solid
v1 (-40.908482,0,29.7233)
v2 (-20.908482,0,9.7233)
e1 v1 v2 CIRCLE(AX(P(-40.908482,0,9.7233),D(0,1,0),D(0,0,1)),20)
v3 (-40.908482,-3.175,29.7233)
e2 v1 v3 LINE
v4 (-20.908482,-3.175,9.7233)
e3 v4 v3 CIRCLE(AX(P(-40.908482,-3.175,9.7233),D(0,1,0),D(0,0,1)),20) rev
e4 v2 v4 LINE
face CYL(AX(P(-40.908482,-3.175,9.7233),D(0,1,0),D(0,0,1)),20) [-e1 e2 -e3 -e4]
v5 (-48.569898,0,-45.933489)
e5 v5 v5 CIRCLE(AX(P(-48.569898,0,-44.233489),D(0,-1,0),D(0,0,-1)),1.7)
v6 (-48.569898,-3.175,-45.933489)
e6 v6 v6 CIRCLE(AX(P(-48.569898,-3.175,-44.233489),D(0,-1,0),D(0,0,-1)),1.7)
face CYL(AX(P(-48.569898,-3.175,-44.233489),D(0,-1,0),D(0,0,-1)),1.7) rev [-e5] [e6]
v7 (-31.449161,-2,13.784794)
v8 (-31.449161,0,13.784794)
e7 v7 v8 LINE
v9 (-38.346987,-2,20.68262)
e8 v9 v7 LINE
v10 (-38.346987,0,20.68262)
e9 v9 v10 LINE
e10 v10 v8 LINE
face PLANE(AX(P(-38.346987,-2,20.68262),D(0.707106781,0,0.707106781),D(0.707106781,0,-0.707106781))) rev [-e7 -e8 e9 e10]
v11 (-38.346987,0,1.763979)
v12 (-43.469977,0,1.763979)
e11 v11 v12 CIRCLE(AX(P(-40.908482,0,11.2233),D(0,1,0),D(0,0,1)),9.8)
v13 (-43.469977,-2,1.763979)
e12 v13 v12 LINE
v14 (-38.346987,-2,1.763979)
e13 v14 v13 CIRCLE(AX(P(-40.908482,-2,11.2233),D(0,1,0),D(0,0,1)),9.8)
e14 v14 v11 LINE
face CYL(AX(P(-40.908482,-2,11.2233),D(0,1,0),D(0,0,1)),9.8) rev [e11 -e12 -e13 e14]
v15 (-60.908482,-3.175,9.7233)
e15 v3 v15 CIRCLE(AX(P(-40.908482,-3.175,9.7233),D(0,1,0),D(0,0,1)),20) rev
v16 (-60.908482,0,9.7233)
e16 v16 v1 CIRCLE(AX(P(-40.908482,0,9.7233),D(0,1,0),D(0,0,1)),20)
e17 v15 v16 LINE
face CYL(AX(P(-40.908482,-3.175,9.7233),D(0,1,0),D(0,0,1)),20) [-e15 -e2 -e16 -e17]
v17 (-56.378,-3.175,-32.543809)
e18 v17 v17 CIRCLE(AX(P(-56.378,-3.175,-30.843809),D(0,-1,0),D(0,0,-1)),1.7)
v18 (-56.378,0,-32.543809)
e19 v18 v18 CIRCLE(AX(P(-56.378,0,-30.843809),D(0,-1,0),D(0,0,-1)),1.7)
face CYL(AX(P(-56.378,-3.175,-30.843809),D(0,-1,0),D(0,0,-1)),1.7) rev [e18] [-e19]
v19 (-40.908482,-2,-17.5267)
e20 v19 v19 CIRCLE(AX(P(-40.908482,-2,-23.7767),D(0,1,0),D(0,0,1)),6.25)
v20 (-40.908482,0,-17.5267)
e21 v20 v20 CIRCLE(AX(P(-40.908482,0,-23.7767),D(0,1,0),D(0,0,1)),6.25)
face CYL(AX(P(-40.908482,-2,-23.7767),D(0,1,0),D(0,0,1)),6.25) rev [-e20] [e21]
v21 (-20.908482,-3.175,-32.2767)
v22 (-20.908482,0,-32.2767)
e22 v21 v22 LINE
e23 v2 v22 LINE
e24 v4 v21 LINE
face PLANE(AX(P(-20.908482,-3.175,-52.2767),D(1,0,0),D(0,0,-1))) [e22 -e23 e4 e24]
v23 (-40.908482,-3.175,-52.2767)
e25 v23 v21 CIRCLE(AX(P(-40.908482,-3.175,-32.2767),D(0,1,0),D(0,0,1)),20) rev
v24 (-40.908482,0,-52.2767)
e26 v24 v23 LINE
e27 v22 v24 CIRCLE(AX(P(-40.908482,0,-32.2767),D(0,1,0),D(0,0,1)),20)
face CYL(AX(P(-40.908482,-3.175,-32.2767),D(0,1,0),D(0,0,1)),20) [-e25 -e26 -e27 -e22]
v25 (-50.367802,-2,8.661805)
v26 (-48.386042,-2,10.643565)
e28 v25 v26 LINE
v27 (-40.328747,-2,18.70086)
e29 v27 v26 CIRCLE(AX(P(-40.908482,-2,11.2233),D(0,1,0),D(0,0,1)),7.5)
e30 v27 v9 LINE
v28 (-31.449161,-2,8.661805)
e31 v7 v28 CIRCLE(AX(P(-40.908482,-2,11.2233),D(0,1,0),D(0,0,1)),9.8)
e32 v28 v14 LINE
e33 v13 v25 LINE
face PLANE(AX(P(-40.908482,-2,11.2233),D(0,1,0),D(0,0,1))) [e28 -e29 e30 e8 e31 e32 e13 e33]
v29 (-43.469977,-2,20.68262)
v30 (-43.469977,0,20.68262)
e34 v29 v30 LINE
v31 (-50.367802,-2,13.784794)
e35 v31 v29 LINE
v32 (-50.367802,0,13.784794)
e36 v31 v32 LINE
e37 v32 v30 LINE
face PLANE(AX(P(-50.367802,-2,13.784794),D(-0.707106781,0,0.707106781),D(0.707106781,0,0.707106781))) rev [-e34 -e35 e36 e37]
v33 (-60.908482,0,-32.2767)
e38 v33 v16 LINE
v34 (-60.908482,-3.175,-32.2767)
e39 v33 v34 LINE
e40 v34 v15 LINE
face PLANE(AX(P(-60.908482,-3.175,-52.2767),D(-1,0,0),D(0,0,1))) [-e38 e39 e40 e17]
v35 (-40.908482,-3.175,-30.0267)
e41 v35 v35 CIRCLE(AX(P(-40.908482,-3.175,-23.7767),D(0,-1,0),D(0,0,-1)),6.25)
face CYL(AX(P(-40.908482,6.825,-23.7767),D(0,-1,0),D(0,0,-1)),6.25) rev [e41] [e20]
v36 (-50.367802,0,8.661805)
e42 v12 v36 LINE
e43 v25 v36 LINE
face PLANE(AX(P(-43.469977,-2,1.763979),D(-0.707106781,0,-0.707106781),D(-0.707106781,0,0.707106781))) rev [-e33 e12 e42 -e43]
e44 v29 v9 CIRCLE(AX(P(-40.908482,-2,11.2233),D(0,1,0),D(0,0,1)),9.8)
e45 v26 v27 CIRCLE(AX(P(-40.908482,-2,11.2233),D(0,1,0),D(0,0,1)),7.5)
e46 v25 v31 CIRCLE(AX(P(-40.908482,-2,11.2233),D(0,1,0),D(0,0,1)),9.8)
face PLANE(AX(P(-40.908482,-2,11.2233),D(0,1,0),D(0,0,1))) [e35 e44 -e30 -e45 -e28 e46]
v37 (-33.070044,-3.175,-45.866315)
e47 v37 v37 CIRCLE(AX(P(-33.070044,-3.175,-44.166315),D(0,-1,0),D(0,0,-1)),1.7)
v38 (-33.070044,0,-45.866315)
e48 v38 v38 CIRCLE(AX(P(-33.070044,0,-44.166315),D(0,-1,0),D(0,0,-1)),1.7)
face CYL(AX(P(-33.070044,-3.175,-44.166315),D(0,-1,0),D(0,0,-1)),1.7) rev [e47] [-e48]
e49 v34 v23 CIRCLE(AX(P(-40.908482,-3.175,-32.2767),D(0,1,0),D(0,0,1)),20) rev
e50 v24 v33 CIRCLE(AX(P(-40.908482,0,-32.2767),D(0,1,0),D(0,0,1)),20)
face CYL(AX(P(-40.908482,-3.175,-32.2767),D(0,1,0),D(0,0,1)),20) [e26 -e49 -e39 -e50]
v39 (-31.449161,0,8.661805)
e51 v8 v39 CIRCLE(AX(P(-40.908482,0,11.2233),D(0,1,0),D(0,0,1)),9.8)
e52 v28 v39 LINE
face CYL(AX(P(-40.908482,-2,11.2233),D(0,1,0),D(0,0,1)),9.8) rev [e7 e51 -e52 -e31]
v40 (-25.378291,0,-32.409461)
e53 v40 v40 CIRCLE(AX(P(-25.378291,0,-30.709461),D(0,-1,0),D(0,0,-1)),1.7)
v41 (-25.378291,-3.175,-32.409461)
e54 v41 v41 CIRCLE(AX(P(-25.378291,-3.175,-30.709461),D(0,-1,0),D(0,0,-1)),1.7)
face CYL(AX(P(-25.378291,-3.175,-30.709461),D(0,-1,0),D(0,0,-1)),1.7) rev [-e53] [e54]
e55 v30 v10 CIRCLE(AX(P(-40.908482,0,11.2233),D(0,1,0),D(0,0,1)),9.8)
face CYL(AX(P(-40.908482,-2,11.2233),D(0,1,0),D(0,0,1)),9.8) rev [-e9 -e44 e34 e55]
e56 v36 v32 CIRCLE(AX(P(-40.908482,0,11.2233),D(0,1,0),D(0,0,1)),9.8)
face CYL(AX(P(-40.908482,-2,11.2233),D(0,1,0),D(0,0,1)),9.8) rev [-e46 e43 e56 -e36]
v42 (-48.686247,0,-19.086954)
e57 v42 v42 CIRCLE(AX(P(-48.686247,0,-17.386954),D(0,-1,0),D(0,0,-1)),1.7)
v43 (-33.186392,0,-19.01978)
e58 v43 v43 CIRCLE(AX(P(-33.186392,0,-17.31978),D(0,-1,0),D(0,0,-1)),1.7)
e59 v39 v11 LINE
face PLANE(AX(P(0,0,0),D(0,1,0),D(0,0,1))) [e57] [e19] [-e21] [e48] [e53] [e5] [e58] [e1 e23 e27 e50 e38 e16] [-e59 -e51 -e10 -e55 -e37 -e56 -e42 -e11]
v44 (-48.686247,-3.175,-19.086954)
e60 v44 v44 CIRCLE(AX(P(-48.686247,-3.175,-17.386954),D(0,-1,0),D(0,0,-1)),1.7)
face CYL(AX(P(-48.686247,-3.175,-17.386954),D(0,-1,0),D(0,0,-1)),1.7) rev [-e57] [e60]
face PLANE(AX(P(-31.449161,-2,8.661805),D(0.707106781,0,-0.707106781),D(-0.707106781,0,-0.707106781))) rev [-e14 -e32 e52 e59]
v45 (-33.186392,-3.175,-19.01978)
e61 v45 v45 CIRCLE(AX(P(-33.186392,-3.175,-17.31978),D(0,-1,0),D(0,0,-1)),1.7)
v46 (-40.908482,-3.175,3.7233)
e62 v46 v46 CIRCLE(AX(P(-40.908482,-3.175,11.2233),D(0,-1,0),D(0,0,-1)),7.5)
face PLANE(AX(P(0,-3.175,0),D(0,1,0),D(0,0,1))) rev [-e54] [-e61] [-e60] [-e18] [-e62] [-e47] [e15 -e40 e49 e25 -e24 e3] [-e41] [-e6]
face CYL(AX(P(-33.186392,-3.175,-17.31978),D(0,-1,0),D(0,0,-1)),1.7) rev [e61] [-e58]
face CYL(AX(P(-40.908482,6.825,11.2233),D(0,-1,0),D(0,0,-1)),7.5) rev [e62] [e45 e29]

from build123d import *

# Parameters (mm, degrees)
CROQUIS1_W                   = 40
CROQUIS1_H                   = 82
BRIDA_BASE1_DEPTH            = 3.175
CROQUIS6_R                   = 6.25
CORTAR_EXTRUIR17_DEPTH       = 2
CORTAR_EXTRUIR5_START        = -10
CROQUIS5_R                   = 7.5
CROQUIS5_R_2                 = 6.25
CORTAR_EXTRUIR5_DEPTH        = 10
REDONDEO1_R                  = 20
TALADRO_DE_MARGEN_PARA_M31_D = 3.4


# Sheet-metal steps are written as plain solids
with BuildPart() as part:
    # Croquis1 → Brida base1 (new body)
    with BuildSketch(Plane(origin=(0, 0, 0), x_dir=(1, 0, 0), z_dir=(0, 1, 0))):
        with Locations((-40.908481915, 11.276700353)):
            Rectangle(CROQUIS1_W, CROQUIS1_H)
    extrude(amount=-BRIDA_BASE1_DEPTH)

    # Croquis6 → Cortar-Extruir17 (cut)
    with BuildSketch(Plane(origin=(0, 0, 0), x_dir=(1, 0, 0), z_dir=(0, 1, 0))):
        with Locations(Location((-40.908481915, 23.776700353, 0), (0, 0, 270))):
            Circle(CROQUIS6_R)
        with BuildLine():
            Line((-43.469976683, -1.763979135), (-50.367802427, -8.661804879))
            ThreePointArc((-50.367802427, -8.661804879), (-50.708481915, -11.223299647), (-50.367802427, -13.784794415))
            Line((-50.367802427, -13.784794415), (-43.469976683, -20.682620159))
            ThreePointArc((-43.469976683, -20.682620159), (-40.908481915, -21.023299647), (-38.346987147, -20.682620159))
            Line((-38.346987147, -20.682620159), (-31.449161403, -13.784794415))
            ThreePointArc((-31.449161403, -13.784794415), (-31.108481915, -11.223299647), (-31.449161403, -8.661804879))
            Line((-31.449161403, -8.661804879), (-38.346987147, -1.763979135))
            ThreePointArc((-38.346987147, -1.763979135), (-40.908481915, -1.423299647), (-43.469976683, -1.763979135))
        make_face()
    extrude(amount=-CORTAR_EXTRUIR17_DEPTH, mode=Mode.SUBTRACT)

    # Croquis5 → Cortar-Extruir5 (cut)
    with BuildSketch(Plane.XZ.offset(3.175).offset(CORTAR_EXTRUIR5_START)):
        with Locations(Location((-40.908481915, 11.223299647, 0), (0, 0, 270))):
            Circle(CROQUIS5_R)
        with Locations(Location((-40.908481915, -23.776700353, 0), (0, 0, 90))):
            Circle(CROQUIS5_R_2)
    extrude(amount=CORTAR_EXTRUIR5_DEPTH, mode=Mode.SUBTRACT)

    # Redondeo1
    redondeo1_edges = [part.edges().sort_by_distance(p)[0] for p in [
        (-60.908481915, -1.5875, -52.276700353),
        (-20.908481915, -1.5875, -52.276700353),
        (-20.908481915, -1.5875, 29.723299647),
        (-60.908481915, -1.5875, 29.723299647),
    ]]
    fillet(redondeo1_edges, radius=REDONDEO1_R - 0.0001)  # a hair under: the kernel refuses the full size

    # Taladro de margen para M31 (through all)
    with Locations(Plane(origin=(-178.498967671, -3.175, 246.519317109), x_dir=(0.8065687193086877, 0, 0.59114033954108), z_dir=(0, -1, 0))):
        with Locations((-65.46157961, -295.903051669), (-67.078989392, -311.31843313), (-51.302762764, -289.596078899), (-54.537582329, -320.426841821), (-40.378765484, -314.119869051), (-38.761355701, -298.70448759)):
            Hole(TALADRO_DE_MARGEN_PARA_M31_D / 2)


solid = part.part
